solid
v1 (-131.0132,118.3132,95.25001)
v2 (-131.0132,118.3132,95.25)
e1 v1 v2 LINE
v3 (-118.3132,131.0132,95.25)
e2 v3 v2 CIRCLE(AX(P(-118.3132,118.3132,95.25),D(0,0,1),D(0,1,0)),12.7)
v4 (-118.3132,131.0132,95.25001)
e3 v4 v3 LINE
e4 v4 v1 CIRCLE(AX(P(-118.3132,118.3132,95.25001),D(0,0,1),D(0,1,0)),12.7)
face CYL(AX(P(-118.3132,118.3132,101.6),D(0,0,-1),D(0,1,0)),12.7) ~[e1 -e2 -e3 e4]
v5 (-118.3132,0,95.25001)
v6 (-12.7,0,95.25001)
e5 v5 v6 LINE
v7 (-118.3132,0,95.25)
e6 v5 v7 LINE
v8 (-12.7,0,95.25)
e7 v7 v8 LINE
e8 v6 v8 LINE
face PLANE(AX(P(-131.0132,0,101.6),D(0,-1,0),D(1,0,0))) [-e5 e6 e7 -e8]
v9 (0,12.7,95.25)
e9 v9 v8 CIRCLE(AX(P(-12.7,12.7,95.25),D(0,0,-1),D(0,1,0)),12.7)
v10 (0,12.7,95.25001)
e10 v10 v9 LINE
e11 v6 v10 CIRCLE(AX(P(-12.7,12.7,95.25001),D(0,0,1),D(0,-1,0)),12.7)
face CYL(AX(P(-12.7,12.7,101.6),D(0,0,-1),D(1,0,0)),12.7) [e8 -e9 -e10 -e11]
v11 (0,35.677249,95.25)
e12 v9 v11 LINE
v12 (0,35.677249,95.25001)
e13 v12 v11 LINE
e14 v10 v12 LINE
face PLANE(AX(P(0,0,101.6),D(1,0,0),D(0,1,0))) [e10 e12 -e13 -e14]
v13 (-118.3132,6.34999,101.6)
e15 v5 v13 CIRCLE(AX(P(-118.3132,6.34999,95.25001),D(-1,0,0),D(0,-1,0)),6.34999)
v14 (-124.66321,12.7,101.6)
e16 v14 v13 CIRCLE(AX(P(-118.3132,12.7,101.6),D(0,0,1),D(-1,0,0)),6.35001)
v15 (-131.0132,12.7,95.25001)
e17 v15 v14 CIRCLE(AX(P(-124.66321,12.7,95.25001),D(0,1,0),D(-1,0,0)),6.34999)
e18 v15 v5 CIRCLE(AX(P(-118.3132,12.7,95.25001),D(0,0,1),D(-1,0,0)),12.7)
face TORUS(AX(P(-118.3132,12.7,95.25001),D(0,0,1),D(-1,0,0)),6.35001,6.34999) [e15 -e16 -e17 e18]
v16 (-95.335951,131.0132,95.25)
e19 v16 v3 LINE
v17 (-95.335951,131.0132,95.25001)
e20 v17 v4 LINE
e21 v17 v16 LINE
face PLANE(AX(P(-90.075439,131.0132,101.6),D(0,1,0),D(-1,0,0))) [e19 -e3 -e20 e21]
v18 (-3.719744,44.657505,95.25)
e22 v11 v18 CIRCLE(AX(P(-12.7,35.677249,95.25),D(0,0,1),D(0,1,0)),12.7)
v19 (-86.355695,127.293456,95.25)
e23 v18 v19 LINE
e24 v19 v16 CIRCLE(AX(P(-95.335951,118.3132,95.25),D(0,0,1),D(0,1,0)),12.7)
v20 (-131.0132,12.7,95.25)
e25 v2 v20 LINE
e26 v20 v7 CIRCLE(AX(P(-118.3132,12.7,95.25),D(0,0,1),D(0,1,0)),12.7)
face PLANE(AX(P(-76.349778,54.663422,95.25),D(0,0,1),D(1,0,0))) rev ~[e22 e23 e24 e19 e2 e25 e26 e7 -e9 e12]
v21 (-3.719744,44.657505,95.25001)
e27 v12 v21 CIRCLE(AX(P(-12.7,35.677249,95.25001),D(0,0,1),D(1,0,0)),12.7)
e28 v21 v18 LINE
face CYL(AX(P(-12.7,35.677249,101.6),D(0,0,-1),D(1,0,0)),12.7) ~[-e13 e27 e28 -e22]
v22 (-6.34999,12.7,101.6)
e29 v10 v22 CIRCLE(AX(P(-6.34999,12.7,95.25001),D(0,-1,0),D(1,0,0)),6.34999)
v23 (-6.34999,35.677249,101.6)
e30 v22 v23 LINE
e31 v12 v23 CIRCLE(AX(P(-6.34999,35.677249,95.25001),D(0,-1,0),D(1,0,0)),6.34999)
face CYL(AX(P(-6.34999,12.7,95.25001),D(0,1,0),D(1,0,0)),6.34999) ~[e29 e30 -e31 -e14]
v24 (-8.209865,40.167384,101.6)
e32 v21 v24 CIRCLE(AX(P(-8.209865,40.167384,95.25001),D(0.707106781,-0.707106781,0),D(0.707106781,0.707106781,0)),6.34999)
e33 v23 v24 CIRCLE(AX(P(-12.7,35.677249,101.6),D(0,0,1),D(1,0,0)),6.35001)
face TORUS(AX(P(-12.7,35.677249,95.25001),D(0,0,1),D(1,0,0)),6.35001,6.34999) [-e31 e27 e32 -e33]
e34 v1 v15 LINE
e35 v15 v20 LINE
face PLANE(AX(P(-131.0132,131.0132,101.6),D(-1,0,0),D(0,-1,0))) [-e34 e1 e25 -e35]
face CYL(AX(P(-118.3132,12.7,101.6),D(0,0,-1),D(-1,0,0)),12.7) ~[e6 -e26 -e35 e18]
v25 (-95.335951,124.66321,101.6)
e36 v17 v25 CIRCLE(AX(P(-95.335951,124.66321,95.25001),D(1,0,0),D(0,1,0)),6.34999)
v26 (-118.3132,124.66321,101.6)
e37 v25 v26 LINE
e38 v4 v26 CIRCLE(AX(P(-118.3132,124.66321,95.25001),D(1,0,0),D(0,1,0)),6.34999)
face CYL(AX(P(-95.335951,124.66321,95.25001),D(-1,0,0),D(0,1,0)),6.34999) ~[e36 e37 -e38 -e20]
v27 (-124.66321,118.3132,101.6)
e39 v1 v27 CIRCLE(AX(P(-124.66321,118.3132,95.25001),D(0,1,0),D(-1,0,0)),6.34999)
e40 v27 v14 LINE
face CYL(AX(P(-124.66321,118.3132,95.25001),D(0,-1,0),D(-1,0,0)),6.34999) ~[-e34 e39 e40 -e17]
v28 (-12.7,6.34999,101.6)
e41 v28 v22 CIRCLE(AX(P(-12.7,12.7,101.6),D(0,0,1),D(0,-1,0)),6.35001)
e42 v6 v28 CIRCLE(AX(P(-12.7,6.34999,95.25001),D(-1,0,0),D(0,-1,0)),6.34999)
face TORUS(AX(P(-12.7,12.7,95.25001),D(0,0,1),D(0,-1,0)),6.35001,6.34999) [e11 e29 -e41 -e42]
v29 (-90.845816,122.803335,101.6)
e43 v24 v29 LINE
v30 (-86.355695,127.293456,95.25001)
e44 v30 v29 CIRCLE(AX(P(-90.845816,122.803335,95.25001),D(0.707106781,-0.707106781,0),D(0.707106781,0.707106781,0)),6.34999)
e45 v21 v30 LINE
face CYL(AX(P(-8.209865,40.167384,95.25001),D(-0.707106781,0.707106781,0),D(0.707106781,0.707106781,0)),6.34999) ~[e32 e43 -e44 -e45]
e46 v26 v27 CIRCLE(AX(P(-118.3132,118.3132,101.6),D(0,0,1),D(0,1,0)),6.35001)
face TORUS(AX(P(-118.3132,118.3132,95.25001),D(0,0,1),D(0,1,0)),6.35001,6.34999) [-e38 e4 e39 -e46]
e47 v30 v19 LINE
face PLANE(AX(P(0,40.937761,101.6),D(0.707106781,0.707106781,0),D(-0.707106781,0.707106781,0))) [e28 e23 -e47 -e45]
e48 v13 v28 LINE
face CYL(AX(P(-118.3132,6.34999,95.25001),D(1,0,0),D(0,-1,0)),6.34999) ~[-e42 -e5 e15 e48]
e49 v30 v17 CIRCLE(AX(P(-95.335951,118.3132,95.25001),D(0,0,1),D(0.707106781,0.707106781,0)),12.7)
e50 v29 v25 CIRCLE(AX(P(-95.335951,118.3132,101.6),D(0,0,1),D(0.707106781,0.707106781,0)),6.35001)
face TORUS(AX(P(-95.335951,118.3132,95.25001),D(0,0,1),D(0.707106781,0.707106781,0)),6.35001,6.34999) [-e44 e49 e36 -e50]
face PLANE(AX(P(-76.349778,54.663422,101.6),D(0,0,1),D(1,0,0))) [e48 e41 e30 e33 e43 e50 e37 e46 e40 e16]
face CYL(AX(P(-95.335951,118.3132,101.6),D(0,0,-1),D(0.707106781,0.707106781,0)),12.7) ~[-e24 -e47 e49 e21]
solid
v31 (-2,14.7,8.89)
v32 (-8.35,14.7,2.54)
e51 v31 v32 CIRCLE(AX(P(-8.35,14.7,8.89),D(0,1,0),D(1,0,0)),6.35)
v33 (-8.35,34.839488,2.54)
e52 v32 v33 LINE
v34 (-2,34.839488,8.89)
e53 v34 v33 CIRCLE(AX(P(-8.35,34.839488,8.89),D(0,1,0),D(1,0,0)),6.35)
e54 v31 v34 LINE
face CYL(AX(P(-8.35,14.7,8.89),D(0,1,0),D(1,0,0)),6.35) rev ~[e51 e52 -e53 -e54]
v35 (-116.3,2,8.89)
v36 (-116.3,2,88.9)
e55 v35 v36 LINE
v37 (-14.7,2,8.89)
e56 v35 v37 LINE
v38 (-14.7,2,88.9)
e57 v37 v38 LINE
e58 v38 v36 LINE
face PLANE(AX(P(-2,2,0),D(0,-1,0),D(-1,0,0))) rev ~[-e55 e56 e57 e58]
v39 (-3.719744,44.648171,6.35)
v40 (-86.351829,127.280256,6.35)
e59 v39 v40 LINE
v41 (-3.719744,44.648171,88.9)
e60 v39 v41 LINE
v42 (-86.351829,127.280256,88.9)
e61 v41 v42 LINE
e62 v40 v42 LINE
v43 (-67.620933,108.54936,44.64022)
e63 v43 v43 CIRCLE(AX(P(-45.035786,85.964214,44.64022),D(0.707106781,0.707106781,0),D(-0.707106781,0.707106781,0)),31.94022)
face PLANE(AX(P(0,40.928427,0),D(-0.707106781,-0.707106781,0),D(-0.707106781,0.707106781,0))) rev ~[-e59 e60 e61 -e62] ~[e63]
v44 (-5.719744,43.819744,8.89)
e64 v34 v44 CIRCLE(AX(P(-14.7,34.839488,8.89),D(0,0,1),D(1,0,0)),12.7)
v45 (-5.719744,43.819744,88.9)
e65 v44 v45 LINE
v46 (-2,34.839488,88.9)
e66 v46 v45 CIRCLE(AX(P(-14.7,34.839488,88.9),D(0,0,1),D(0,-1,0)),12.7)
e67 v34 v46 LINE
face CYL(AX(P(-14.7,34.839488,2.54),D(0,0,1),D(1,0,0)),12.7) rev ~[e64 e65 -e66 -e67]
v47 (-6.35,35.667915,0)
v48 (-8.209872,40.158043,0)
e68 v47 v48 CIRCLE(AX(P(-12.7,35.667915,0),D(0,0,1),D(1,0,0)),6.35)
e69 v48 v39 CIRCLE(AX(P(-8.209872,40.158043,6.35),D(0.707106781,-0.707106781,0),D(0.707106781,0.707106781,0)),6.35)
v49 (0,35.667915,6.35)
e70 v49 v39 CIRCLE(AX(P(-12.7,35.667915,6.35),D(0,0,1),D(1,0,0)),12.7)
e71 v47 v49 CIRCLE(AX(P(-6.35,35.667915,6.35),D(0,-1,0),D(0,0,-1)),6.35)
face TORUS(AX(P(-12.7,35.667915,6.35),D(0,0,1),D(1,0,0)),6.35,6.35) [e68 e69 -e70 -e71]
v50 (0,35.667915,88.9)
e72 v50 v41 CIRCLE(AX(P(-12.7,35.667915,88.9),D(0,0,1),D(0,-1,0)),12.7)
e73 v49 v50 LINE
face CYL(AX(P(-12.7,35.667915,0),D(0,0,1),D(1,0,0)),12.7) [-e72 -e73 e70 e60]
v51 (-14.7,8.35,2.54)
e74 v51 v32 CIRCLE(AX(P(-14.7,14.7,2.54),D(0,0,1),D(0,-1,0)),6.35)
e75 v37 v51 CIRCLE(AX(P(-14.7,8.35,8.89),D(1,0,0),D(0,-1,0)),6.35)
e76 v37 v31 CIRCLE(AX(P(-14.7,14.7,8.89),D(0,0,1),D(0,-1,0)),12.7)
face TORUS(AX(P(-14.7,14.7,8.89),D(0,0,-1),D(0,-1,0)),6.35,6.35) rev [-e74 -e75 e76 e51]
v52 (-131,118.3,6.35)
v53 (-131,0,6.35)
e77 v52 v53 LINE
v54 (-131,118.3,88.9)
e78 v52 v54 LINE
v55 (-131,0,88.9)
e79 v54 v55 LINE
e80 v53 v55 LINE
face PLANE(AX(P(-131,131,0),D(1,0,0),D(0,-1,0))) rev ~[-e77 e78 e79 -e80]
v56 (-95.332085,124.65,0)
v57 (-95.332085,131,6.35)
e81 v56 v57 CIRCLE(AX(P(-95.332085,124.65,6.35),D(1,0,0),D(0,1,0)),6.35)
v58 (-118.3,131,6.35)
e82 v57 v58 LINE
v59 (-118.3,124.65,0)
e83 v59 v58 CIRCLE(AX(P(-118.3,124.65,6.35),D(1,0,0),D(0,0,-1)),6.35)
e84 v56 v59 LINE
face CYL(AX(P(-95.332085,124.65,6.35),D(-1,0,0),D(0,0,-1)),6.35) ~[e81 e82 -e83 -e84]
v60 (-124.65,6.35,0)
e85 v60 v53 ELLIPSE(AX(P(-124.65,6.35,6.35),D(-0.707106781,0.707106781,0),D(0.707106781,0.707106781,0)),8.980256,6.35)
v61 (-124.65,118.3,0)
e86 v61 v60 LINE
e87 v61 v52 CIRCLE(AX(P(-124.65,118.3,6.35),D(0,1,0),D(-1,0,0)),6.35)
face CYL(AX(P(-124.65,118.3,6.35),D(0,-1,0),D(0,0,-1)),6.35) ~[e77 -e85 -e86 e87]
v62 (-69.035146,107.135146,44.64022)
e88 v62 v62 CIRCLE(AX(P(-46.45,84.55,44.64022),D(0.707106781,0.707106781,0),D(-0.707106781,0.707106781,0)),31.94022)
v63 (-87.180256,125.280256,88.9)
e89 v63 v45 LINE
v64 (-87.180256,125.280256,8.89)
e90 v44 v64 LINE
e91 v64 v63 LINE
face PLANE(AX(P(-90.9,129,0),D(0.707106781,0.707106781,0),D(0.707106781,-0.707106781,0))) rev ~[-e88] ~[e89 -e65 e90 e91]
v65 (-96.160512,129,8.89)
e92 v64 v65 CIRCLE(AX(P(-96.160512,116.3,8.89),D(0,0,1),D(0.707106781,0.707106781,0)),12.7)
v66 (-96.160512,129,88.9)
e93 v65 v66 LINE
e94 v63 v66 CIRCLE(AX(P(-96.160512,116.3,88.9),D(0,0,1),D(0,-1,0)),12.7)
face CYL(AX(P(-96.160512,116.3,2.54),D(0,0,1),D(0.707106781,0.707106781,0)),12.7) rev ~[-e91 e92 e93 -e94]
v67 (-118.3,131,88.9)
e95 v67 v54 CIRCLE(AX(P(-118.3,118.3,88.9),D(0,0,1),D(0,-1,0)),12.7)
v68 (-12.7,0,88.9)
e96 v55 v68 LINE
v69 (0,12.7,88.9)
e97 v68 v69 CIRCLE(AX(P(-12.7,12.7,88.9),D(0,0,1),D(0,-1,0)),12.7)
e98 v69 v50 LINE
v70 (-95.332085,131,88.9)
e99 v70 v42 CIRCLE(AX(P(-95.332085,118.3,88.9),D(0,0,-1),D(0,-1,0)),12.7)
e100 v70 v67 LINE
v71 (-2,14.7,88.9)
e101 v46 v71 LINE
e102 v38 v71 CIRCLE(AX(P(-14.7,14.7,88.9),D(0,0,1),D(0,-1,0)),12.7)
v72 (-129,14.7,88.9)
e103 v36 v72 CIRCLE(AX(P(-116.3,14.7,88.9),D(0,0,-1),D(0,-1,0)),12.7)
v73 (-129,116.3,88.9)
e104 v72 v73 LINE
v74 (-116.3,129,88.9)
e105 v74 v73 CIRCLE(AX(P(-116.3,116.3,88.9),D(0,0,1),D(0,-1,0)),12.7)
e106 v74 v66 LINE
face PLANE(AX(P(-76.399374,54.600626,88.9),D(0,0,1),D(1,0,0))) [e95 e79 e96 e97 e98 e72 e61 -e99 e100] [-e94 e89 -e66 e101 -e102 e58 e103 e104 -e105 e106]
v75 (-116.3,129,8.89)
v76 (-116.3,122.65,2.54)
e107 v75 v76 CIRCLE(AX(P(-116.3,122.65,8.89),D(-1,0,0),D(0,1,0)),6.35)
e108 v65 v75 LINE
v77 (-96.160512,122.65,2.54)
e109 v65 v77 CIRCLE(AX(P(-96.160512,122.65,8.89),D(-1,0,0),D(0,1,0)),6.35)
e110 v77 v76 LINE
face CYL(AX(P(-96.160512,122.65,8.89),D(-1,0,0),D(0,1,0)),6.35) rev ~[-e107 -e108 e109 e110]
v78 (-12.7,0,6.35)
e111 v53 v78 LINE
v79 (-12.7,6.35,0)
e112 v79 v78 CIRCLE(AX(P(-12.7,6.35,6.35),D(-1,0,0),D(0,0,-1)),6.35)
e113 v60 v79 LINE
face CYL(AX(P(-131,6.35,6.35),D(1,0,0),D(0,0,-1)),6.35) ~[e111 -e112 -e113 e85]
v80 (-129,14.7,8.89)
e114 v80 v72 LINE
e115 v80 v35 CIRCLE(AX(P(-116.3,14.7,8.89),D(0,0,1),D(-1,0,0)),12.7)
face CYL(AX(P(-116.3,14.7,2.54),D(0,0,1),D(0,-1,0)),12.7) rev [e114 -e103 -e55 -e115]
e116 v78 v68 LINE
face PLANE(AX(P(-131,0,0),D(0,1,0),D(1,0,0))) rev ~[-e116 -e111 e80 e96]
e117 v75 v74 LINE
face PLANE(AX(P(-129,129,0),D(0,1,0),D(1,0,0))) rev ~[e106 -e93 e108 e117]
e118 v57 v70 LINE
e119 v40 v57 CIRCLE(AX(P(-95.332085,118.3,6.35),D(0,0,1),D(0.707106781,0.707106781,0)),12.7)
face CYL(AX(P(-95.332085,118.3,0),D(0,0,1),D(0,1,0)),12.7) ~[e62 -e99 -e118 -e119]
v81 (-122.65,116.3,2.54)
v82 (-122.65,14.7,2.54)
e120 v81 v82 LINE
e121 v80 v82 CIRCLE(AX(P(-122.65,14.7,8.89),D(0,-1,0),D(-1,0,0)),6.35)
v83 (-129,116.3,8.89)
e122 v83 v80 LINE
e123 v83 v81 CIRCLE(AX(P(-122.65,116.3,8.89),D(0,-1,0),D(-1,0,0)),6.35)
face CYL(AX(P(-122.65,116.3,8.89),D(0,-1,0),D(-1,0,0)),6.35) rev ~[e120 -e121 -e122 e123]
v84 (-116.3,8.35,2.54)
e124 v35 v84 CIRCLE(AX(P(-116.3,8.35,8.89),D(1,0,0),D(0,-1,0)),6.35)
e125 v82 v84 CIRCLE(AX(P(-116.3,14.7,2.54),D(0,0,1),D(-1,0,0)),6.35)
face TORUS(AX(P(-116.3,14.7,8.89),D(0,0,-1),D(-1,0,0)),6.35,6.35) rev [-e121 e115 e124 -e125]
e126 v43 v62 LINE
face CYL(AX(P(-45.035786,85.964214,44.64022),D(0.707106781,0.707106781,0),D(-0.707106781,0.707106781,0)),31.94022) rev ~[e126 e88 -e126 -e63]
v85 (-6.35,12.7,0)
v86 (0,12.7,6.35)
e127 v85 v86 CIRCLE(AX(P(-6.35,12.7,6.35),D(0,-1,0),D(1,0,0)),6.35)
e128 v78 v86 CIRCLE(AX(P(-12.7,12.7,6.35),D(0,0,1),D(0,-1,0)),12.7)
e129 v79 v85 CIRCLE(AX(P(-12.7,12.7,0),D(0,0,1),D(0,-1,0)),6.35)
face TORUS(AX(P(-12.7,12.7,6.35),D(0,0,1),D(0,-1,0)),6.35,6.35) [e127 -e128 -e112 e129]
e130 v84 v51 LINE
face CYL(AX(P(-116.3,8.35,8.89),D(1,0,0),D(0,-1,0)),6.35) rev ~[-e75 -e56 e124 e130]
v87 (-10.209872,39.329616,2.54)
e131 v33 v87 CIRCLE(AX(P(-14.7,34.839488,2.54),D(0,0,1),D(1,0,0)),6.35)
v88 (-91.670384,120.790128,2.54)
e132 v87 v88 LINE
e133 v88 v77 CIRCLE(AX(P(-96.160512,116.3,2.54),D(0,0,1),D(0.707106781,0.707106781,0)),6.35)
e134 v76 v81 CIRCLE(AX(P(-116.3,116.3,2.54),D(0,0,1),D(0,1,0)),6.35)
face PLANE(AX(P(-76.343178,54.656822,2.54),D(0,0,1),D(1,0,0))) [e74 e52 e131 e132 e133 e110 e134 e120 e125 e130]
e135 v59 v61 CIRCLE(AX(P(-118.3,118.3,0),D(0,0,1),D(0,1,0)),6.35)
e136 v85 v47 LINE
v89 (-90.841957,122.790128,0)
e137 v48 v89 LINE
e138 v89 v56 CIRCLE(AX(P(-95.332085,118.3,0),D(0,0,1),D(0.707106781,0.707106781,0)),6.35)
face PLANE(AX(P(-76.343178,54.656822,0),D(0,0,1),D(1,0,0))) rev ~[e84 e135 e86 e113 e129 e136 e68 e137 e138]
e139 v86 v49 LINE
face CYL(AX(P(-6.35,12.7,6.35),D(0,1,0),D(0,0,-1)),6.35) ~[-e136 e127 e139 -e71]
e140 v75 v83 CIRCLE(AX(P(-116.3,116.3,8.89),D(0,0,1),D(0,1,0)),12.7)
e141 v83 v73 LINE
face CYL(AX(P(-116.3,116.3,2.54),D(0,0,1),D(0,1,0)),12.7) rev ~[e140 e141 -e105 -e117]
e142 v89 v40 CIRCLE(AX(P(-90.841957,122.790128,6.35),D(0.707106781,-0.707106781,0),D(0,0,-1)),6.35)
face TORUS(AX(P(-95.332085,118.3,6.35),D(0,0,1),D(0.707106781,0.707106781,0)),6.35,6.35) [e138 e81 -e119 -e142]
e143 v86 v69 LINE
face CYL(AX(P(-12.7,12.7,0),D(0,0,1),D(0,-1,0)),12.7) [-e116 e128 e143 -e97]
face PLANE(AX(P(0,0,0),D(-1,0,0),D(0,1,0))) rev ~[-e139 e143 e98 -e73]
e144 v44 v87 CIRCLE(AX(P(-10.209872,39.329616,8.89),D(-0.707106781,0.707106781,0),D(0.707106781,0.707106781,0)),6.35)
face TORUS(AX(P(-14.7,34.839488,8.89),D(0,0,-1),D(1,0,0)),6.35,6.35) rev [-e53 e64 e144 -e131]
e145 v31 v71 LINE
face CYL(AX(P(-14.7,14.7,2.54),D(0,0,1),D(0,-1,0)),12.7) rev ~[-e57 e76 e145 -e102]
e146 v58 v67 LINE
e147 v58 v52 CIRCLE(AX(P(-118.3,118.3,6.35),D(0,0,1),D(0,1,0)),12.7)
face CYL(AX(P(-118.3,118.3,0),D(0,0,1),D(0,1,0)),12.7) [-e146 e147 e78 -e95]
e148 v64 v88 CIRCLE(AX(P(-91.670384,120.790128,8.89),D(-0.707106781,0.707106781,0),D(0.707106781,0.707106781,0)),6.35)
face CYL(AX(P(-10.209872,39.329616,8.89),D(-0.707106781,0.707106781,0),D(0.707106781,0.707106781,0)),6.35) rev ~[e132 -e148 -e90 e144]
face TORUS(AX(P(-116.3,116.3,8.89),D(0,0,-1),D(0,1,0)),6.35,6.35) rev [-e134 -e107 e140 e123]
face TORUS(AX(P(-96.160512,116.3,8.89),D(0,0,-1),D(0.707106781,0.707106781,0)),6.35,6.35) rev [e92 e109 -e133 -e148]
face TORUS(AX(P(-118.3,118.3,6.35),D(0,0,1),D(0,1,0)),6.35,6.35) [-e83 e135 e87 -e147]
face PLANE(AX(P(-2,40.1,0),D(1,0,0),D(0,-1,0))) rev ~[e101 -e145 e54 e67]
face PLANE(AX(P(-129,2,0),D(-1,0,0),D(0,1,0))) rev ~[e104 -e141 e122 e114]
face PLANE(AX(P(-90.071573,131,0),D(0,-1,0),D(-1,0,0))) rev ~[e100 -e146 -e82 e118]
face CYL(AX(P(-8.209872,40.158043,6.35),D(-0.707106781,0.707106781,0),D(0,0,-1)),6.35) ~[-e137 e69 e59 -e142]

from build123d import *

# Parameters (mm, degrees)
F3_DEPTH = 6.35
F4_DEPTH = 88.9
F5_DEPTH = 2.54
F6_R     = 31.9402199722
F7_DEPTH = 25.4
F8_R     = 12.7
F9_R     = 12.7
F10_R    = 6.34999
F11_R    = 6.35


# Not quite as in the source:
# - a fillet or chamfer is up to 0.001 mm smaller than in the source, because OpenCascade refuses the exact size


with BuildPart() as f3:
    # F2 (on offset) → F3 (new body)
    with BuildSketch(Plane.XY.offset(101.6)):
        Polygon((-129.0066, 2.0066), (-2.0066, 2.0066), (-2.0066, 40.1066), (-90.9066, 129.0066), (-129.0066, 129.0066), align=None)
        Polygon((-2.0066, 2.0066), (0, 0), (0, 40.9377609343), (-2.0066, 40.1066), align=None)
        Polygon((-90.0754390657, 131.0132), (-131.0132, 131.0132), (-129.0066, 129.0066), (-90.9066, 129.0066), align=None)
        Polygon((-2.0066, 40.1066), (0, 40.9377609343), (-90.0754390657, 131.0132), (-90.9066, 129.0066), align=None)
        Polygon((-131.0132, 0), (0, 0), (-2.0066, 2.0066), (-129.0066, 2.0066), align=None)
        Polygon((-131.0132, 131.0132), (-131.0132, 0), (-129.0066, 2.0066), (-129.0066, 129.0066), align=None)
    extrude(amount=-F3_DEPTH)

    # F9
    f9_edges = [f3.edges().sort_by_distance(p)[0] for p in [
        (0, 40.937761, 98.425),
        (-90.075439, 131.0132, 98.425),
        (-131.0132, 131.0132, 98.425),
        (-131.0132, 0, 98.425),
        (0, 0, 98.425),
    ]]
    fillet(f9_edges, radius=F9_R)

    # F10 (radius 6.35 in the source; OpenCascade refuses exactly that, so slightly less here)
    f10_edges = [f3.edges().sort_by_distance(p)[0] for p in [
        (0, 24.188624, 101.6),
        (-3.719744, 3.719744, 101.6),
        (-0.96673, 40.537328, 101.6),
        (-65.5066, 0, 101.6),
        (-45.03772, 85.97548, 101.6),
        (-127.293456, 3.719744, 101.6),
        (-90.475872, 130.04647, 101.6),
        (-131.0132, 65.5066, 101.6),
        (-106.824576, 131.0132, 101.6),
        (-127.293456, 127.293456, 101.6),
    ]]
    fillet(f10_edges, radius=F10_R)


with BuildPart() as f4:
    # F0 (on Top) → F4 (new body)
    with BuildSketch(Plane.XY):
        Polygon((-90.0715728753, 131), (-131, 131), (-131, 0), (0, 0), (0, 40.9284271247), align=None)
        Polygon((-129, 2), (-129, 129), (-90.9, 129), (-2, 40.1), (-2, 2), align=None, mode=Mode.SUBTRACT)
    extrude(amount=F4_DEPTH)

    # F0 (on Top) → F5 (join)
    with BuildSketch(Plane.XY):
        Polygon((-90.9, 129), (-129, 129), (-129, 2), (-2, 2), (-2, 40.1), align=None)
    extrude(amount=F5_DEPTH)

    # F6 (on face) → F7 (cut)
    with BuildSketch(Plane(origin=(20.4642135624, 20.4642135624, 0), x_dir=(-0.7071067812, 0.7071067812, 0), z_dir=(0.7071067812, 0.7071067812, 0))):
        with Locations((92.6309883354, 44.6402199722)):
            Circle(F6_R)
    extrude(amount=-F7_DEPTH, mode=Mode.SUBTRACT)

    # F8
    f8_edges = [f4.edges().sort_by_distance(p)[0] for p in [
        (0, 40.928427, 44.45),
        (0, 0, 44.45),
        (-90.071573, 131, 44.45),
        (-131, 131, 44.45),
        (-129, 2, 45.72),
        (-2, 2, 45.72),
        (-2, 40.1, 45.72),
        (-90.9, 129, 45.72),
        (-129, 129, 45.72),
    ]]
    fillet(f8_edges, radius=F8_R)

    # F11
    f11_edges = [f4.edges().sort_by_distance(p)[0] for p in [
        (-106.230256, 129, 2.54),
        (-91.300433, 128.03327, 2.54),
        (-125.280256, 125.280256, 2.54),
        (-46.45, 84.55, 2.54),
        (-129, 65.5, 2.54),
        (-2.96673, 39.699567, 2.54),
        (-125.280256, 5.719744, 2.54),
        (-2, 24.769744, 2.54),
        (-65.5, 2, 2.54),
        (-5.719744, 5.719744, 2.54),
        (-45.035786, 85.964214, 0),
        (-0.96673, 40.527994, 0),
        (-90.472006, 130.03327, 0),
        (0, 24.183957, 0),
        (-106.816043, 131, 0),
        (-3.719744, 3.719744, 0),
        (-127.280256, 127.280256, 0),
        (-71.85, 0, 0),
        (-131, 59.15, 0),
    ]]
    fillet(f11_edges, radius=F11_R)


solid = Compound([f3.part, f4.part])
